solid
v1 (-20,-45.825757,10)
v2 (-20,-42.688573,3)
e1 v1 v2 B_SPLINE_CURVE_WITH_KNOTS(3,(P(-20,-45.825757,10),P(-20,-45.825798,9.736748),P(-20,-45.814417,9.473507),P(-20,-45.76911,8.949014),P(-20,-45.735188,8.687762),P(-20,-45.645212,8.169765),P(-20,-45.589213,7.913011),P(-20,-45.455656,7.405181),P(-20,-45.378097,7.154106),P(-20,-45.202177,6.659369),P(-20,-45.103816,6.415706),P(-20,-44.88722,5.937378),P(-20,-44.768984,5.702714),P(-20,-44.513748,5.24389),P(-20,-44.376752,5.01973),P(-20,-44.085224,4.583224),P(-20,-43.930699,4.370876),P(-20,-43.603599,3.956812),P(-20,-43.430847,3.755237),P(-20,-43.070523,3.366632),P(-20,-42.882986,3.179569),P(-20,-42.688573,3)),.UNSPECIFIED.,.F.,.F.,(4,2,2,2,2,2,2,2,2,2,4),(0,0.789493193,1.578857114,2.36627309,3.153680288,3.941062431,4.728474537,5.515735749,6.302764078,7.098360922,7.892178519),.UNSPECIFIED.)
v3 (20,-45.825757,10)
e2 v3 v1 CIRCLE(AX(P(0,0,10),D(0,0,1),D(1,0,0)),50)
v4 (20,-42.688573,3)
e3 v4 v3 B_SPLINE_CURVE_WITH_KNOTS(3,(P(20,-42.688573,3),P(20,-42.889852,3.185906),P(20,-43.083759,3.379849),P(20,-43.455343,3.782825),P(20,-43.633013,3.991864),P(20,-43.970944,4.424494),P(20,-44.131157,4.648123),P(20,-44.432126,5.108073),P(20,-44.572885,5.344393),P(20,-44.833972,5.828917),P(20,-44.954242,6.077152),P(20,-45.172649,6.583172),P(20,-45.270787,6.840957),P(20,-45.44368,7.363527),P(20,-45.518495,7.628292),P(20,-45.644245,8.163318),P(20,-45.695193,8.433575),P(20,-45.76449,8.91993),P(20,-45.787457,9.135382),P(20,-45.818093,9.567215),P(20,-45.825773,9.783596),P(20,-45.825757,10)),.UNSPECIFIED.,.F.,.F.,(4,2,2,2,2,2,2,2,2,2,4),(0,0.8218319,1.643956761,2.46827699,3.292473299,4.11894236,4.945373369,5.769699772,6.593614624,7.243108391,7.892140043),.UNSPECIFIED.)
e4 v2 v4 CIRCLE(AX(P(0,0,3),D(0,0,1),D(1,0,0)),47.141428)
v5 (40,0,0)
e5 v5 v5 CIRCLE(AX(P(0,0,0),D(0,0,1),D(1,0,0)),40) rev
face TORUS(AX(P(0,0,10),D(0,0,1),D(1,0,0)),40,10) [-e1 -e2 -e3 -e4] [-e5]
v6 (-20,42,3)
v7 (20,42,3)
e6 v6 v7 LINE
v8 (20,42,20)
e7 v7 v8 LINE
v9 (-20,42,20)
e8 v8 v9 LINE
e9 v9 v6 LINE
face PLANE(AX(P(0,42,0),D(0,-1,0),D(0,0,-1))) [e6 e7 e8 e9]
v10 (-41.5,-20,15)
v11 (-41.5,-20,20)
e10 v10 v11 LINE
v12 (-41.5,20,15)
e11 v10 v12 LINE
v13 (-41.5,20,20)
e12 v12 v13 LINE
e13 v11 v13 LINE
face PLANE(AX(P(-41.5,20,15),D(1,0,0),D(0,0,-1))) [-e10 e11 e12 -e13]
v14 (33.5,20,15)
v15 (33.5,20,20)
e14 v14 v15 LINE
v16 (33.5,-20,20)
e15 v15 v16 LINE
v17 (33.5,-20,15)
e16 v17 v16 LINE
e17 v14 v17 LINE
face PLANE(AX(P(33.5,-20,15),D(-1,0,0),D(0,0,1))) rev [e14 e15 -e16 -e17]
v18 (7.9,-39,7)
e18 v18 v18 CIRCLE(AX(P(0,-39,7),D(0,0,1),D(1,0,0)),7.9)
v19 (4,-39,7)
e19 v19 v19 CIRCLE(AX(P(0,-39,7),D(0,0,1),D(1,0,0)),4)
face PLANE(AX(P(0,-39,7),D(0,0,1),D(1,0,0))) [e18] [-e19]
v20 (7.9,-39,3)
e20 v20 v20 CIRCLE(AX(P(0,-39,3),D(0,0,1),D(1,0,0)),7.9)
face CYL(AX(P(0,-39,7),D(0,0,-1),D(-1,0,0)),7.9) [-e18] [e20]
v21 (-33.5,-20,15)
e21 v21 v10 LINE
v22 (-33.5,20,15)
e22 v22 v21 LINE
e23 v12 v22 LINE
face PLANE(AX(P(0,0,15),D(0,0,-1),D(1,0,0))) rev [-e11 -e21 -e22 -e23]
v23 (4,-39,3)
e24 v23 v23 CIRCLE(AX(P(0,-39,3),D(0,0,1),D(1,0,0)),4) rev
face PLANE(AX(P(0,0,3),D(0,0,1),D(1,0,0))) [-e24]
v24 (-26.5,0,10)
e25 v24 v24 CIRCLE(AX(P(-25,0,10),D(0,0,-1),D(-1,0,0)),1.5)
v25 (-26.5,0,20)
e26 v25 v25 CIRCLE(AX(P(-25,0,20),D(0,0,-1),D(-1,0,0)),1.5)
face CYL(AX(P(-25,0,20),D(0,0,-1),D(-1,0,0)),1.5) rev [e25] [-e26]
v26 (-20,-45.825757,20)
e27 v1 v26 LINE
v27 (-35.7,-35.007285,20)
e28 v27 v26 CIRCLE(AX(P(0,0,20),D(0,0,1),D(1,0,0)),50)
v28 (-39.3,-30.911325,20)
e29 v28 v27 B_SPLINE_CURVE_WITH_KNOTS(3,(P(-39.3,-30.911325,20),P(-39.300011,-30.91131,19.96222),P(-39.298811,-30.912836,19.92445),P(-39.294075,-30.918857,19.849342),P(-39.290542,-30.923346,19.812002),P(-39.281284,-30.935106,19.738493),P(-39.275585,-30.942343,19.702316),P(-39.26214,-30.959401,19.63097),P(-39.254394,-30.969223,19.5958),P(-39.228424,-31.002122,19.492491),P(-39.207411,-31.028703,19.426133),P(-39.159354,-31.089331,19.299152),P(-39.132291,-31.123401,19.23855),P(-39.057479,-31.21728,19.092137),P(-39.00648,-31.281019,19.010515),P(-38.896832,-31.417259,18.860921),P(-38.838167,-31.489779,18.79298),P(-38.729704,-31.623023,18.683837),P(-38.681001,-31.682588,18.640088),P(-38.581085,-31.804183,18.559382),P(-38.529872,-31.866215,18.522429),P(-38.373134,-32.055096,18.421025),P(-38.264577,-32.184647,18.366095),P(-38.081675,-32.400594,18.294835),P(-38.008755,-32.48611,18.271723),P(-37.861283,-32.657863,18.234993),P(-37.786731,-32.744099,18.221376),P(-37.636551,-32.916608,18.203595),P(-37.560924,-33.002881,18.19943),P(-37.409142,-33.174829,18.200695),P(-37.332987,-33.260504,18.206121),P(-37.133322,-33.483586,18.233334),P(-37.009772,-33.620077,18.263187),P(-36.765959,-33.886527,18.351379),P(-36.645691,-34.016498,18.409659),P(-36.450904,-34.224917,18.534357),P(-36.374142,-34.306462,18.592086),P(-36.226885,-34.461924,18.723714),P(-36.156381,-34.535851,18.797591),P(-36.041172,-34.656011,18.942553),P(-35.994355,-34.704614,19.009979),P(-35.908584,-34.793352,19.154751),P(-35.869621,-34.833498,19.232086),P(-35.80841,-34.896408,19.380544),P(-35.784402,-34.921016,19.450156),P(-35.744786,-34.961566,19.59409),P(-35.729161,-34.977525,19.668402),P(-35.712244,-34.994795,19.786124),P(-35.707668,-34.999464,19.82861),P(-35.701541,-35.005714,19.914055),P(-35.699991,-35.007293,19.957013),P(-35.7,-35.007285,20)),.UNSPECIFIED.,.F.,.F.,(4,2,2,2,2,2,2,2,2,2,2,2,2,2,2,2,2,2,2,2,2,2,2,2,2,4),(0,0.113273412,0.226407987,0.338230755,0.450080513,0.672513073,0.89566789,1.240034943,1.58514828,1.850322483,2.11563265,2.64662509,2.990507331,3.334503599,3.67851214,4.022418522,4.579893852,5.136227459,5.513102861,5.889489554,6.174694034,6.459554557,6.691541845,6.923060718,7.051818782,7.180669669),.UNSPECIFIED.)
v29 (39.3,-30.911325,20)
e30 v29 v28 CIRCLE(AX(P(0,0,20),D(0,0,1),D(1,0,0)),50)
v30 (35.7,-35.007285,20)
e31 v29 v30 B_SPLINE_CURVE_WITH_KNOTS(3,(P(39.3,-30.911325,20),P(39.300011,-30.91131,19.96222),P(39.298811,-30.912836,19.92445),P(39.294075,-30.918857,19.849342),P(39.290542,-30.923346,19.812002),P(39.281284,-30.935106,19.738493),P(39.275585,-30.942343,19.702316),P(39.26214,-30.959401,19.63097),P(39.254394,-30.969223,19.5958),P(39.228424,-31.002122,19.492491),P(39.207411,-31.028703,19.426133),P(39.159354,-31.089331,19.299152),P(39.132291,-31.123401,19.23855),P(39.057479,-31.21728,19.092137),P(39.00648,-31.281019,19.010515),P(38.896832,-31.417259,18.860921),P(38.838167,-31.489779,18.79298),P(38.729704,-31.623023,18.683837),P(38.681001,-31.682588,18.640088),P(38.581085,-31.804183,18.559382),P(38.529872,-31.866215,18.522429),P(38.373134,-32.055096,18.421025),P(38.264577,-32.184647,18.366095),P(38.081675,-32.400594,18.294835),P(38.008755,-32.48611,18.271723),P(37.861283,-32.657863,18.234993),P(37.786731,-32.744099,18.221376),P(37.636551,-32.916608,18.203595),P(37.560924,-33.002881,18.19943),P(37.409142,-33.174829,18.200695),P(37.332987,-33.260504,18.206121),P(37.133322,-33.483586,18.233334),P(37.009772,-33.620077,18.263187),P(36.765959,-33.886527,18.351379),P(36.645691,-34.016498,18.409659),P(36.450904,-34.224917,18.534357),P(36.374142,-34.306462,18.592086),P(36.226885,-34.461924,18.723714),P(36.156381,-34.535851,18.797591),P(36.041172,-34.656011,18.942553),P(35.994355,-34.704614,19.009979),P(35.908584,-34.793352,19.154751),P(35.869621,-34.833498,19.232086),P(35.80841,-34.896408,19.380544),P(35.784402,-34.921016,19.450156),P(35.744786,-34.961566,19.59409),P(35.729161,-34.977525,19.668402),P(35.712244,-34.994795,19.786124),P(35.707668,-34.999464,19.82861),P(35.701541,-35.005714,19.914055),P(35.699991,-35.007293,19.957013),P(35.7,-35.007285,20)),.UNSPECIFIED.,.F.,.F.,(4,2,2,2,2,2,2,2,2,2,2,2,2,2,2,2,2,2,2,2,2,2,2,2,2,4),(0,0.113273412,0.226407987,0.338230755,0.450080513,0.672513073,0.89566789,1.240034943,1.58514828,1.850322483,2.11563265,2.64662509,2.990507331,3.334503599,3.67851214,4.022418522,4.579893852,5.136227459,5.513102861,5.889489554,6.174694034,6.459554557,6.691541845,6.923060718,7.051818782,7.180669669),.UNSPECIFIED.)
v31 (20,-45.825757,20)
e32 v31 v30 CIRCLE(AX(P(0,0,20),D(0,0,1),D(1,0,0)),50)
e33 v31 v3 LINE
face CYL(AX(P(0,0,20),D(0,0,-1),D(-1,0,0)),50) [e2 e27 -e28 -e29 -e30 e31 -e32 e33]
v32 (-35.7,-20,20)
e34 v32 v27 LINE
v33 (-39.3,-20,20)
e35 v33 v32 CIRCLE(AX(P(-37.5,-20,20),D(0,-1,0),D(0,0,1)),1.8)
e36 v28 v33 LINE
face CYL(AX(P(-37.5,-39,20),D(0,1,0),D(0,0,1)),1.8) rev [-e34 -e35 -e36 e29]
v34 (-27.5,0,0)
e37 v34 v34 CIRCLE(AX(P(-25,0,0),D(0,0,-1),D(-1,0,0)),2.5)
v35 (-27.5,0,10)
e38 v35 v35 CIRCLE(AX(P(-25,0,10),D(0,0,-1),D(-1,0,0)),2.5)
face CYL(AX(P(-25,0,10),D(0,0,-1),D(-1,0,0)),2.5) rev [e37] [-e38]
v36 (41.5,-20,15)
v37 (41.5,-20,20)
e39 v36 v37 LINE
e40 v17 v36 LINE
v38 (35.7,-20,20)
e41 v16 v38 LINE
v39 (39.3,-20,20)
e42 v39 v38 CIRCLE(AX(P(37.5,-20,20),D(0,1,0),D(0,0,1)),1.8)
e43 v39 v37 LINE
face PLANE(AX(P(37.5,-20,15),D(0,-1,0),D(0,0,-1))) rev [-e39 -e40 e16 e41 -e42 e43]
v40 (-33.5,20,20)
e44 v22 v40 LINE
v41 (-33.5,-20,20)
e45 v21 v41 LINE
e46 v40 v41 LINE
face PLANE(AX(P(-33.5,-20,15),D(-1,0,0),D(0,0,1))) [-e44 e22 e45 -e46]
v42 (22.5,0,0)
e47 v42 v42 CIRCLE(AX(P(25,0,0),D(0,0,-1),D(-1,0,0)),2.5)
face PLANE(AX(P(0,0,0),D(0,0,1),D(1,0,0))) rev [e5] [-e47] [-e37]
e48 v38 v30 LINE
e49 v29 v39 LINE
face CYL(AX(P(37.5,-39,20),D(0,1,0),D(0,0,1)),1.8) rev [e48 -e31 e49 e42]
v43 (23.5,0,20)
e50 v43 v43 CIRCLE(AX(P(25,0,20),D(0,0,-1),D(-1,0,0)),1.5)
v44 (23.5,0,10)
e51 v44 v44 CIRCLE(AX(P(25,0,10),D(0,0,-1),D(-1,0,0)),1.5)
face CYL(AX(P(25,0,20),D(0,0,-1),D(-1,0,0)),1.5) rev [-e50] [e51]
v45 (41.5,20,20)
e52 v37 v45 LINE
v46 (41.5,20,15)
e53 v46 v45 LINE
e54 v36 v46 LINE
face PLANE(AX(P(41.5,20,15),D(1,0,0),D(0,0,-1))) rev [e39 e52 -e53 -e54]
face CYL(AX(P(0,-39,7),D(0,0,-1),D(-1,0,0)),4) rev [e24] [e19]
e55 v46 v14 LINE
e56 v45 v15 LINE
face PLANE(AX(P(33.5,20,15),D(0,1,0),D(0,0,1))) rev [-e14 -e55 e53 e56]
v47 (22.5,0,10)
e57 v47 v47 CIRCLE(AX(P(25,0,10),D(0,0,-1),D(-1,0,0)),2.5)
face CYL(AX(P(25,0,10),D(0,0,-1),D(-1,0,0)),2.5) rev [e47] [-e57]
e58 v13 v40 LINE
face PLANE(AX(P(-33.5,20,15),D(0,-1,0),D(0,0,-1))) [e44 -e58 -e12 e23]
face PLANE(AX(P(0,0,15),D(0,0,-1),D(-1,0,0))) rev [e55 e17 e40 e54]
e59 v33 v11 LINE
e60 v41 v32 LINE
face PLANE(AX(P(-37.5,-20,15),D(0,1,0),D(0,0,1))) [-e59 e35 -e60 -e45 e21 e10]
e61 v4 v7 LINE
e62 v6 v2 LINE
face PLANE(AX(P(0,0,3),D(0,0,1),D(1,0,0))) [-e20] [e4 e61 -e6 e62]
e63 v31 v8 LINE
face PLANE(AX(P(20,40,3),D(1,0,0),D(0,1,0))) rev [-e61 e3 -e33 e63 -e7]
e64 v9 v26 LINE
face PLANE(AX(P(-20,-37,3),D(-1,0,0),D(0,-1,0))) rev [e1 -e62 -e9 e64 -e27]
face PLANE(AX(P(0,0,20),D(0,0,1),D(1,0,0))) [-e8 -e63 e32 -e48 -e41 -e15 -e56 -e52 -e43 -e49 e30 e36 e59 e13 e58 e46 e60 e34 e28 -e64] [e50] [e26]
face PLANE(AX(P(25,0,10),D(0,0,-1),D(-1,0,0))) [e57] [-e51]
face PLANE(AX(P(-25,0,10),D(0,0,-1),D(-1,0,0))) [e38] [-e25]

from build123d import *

# Parameters (mm, degrees)
SKETCH_1_R          = 50
EXTRUDE_1_DEPTH     = 20
CUT_EXTRUDE_1_DEPTH = 17
SKETCH_3_R          = 7.9
SKETCH_3_R_2        = 4
EXTRUDE_2_DEPTH     = 4
CUT_EXTRUDE_2_DEPTH = 5
SKETCH_7_R          = 1.8
CUT_EXTRUDE_3_DEPTH = 19
SKETCH_8_W          = 40
SKETCH_8_H          = 17
CUT_EXTRUDE_4_DEPTH = 2
FILLET_1_R          = 10
SKETCH_10_R         = 2.5
CUT_EXTRUDE_5_DEPTH = 10
SKETCH_11_R         = 1.5
CUT_EXTRUDE_6_DEPTH = 10


with BuildPart() as part:
    # 草图1 → 凸台-拉伸1 (new body)
    with BuildSketch(Plane.XY):
        Circle(SKETCH_1_R)
    extrude(amount=EXTRUDE_1_DEPTH)

    # 草图2 → 切除-拉伸1 (cut)
    with BuildSketch(Plane.XY.offset(20)):
        Polygon((-20, -37), (-20, 0), (-20, 40), (20, 40), (20, -58.754478709), (-20, -58.754478709), align=None)
    extrude(amount=-CUT_EXTRUDE_1_DEPTH, mode=Mode.SUBTRACT)

    # 草图3 → 凸台-拉伸2 (add)
    with BuildSketch(Plane.XY.offset(3)):
        with Locations((0, -39)):
            Circle(SKETCH_3_R)
        with Locations((0, -39)):
            Circle(SKETCH_3_R_2, mode=Mode.SUBTRACT)
    extrude(amount=EXTRUDE_2_DEPTH)

    # 草图5 → 切除-拉伸2 (cut)
    with BuildSketch(Plane.XY.offset(20)):
        Polygon((37.5, -20), (33.5, -20), (33.5, 20), (41.5, 20), (41.5, -20), align=None)
    cut_extrude_2 = extrude(amount=-CUT_EXTRUDE_2_DEPTH, mode=Mode.SUBTRACT)

    # 草图7 → 切除-拉伸3 (cut)
    with BuildSketch(Plane(origin=(0, -20, 0), x_dir=(1, 0, 0), z_dir=(0, 1, 0))):
        with Locations((37.5, -20)):
            Circle(SKETCH_7_R)
    cut_extrude_3 = extrude(amount=-CUT_EXTRUDE_3_DEPTH, mode=Mode.SUBTRACT)

    # 镜向1: 切除-拉伸2, 切除-拉伸3 across plane
    add(cut_extrude_2.mirror(Plane(origin=(0, 0, 0), x_dir=(0, 0, 1), z_dir=(1, 0, 0))), mode=Mode.SUBTRACT)
    add(cut_extrude_3.mirror(Plane(origin=(0, 0, 0), x_dir=(0, 0, 1), z_dir=(1, 0, 0))), mode=Mode.SUBTRACT)

    # 草图8 → 切除-拉伸4 (cut)
    with BuildSketch(Plane.XZ.offset(-40)):
        with Locations((0, 11.5)):
            Rectangle(SKETCH_8_W, SKETCH_8_H)
    extrude(amount=-CUT_EXTRUDE_4_DEPTH, mode=Mode.SUBTRACT)

    # 圆角1
    # the kernel refuses this fillet: 10 mm, written as the material it takes off along each edge
    with BuildSketch(Plane(origin=(0, 0, 0), x_dir=(1, 0, 0), z_dir=(0, -1, 0))) as fillet_1_piece_1:
        with BuildLine():
            CenterArc((50 - FILLET_1_R, FILLET_1_R), FILLET_1_R, 270, 90)
            Line((50 - FILLET_1_R, 0), (50, 0))
            Line((50, 0), (50, FILLET_1_R))
        make_face()
    revolve(axis=Axis((0, 0, 0), (0, 0, 1)), mode=Mode.SUBTRACT)

    # 草图10 → 切除-拉伸5 (cut)
    with BuildSketch(Plane(origin=(0, 0, 0), x_dir=(-1, 0, 0), z_dir=(0, 0, -1))):
        with Locations((25, 0)):
            Circle(SKETCH_10_R)
        with Locations((-25, 0)):
            Circle(SKETCH_10_R)
    extrude(amount=-CUT_EXTRUDE_5_DEPTH, mode=Mode.SUBTRACT)

    # 草图11 → 切除-拉伸6 (cut)
    with BuildSketch(Plane(origin=(0, 0, 10), x_dir=(-1, 0, 0), z_dir=(0, 0, -1))):
        with Locations((-25, 0)):
            Circle(SKETCH_11_R)
        with Locations((25, 0)):
            Circle(SKETCH_11_R)
    extrude(amount=-CUT_EXTRUDE_6_DEPTH, mode=Mode.SUBTRACT)


solid = part.part
